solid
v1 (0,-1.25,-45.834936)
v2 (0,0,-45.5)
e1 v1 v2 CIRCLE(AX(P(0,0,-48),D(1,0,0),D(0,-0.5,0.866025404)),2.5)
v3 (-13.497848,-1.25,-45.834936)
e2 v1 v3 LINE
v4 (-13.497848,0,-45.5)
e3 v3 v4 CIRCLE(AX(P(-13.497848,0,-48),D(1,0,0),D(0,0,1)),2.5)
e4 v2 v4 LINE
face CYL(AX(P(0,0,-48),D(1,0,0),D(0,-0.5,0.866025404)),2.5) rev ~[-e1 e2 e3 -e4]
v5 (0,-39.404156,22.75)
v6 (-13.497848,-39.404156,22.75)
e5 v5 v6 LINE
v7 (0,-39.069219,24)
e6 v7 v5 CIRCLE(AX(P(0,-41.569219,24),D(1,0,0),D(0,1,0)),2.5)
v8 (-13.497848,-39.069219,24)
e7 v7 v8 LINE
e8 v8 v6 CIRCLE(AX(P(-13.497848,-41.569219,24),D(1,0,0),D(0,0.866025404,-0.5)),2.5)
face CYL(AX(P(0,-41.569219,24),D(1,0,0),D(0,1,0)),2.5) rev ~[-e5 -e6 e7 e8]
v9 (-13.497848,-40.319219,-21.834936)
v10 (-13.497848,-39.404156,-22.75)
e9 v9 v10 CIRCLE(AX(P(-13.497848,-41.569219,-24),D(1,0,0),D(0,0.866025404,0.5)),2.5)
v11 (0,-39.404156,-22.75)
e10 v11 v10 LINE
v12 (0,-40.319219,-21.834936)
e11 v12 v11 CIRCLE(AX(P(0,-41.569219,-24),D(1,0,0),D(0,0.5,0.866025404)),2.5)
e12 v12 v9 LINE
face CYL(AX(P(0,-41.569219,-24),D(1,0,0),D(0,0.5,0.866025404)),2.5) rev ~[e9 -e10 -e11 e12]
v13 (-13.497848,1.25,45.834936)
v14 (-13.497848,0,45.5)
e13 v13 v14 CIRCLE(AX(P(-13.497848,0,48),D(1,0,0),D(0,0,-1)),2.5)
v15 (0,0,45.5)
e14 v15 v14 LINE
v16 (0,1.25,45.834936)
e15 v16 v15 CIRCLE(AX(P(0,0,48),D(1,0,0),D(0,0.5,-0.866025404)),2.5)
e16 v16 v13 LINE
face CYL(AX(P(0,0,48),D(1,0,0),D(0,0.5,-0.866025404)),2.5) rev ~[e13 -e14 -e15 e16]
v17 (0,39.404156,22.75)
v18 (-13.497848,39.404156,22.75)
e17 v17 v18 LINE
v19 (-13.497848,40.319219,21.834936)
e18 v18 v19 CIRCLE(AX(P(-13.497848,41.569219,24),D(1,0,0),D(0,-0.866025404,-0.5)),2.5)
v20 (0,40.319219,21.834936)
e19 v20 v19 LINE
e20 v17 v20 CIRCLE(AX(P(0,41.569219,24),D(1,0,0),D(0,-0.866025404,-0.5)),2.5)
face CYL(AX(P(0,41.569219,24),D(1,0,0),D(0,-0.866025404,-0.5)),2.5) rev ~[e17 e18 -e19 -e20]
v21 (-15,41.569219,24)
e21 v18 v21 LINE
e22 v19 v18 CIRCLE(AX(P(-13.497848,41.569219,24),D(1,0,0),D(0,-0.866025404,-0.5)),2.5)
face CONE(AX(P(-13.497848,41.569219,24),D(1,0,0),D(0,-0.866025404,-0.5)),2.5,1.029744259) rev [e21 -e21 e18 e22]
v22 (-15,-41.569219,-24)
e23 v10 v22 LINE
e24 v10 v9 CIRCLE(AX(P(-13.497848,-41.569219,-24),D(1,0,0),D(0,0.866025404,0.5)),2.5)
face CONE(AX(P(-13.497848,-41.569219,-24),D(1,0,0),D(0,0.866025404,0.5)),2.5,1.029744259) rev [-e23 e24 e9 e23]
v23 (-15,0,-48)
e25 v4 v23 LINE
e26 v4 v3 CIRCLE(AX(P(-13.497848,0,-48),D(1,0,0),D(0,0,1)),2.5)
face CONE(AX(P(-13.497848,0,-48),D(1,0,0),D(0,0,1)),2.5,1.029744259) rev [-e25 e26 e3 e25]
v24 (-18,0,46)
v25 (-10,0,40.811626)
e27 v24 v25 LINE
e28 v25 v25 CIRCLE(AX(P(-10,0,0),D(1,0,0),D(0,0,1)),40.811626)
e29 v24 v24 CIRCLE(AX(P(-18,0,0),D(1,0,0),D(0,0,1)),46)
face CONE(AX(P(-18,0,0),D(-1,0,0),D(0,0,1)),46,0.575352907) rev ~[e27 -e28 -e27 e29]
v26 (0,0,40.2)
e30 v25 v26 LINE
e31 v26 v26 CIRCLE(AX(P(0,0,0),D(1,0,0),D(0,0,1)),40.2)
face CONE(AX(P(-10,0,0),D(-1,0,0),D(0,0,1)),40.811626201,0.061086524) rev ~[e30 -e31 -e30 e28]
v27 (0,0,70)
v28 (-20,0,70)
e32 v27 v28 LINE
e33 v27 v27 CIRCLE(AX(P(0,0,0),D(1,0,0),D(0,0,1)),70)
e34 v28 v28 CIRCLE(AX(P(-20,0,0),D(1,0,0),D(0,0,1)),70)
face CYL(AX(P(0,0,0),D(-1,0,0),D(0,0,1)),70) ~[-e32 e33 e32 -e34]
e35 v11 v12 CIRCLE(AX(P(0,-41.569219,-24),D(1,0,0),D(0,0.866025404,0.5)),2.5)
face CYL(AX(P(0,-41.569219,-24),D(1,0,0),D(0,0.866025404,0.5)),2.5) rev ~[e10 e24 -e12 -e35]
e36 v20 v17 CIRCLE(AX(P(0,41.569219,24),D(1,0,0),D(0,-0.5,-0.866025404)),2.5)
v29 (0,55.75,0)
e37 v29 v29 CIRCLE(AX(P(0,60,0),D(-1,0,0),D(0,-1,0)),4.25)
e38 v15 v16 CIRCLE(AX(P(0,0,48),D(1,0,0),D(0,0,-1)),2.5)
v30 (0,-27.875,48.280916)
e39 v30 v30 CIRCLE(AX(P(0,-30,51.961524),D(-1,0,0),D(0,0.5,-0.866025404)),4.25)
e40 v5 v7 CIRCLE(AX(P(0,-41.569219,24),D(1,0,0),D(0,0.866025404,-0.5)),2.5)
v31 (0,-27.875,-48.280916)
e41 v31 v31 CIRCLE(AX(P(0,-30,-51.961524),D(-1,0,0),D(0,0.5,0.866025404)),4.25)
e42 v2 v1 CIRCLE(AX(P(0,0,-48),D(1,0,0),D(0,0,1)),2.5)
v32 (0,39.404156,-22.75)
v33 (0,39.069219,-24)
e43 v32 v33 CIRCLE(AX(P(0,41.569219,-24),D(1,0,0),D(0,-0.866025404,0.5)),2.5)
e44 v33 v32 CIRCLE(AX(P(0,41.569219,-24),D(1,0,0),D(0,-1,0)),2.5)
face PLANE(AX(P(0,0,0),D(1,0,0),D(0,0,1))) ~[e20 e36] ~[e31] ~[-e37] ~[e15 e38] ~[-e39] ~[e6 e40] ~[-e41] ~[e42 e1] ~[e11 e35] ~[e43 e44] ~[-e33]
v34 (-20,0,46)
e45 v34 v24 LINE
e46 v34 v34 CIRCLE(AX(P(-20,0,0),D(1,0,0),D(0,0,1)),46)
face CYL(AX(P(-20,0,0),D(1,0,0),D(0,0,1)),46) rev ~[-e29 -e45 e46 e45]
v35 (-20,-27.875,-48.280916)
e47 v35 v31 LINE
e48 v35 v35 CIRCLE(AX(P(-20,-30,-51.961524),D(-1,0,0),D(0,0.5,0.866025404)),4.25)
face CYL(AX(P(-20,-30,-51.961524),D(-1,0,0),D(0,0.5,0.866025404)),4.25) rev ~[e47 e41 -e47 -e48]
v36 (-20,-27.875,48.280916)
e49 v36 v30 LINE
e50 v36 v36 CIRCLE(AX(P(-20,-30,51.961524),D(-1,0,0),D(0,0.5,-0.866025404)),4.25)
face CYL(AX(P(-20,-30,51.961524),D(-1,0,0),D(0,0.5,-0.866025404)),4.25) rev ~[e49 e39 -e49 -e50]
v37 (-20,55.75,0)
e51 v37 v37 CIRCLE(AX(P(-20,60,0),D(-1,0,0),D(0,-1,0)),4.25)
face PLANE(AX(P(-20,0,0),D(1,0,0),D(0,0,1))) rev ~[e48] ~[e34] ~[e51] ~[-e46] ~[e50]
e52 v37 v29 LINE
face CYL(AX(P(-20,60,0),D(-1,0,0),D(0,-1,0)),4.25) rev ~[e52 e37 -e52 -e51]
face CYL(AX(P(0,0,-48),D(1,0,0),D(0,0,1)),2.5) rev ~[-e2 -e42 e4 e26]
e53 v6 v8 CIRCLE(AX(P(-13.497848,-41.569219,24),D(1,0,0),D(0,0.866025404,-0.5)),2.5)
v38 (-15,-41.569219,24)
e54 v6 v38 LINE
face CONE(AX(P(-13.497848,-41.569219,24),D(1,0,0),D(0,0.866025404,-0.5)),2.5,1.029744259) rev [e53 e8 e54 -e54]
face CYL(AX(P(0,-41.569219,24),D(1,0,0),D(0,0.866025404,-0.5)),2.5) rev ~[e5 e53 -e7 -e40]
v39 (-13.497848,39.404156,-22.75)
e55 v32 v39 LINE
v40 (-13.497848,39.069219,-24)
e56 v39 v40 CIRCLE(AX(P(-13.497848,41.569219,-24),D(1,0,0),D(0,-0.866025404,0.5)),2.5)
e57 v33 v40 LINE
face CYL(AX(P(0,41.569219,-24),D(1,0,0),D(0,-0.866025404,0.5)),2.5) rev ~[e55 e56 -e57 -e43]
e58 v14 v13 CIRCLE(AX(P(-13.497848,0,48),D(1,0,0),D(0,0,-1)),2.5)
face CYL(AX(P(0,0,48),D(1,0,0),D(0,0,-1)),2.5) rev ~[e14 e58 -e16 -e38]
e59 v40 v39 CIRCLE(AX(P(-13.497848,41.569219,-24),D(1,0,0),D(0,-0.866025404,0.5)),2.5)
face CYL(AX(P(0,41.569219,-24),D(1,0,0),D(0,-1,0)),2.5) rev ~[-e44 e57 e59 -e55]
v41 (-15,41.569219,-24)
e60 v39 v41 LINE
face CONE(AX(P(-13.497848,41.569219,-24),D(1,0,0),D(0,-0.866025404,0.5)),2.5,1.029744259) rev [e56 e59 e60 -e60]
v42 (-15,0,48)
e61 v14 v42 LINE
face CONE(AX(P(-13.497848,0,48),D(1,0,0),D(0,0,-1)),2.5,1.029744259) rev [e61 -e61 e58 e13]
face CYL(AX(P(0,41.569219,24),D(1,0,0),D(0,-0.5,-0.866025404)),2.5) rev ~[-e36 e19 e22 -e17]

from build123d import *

# Parameters (mm, degrees)
F2_R            = 4.25
F3_DEPTH        = 20.001
F3_COPIES_COUNT = 3
F5_DEPTH        = 15
F5_COPIES_COUNT = 6


# Not quite as in the source:
# - a fillet or chamfer that OpenCascade refuses, or shapes differently, is made with other operations: its cross-section is extruded or revolved along the edge and cut away or added
# - a pattern or mirror of a feature is missing from the dataset's text; its kind, count and spacing are read off the source's solid


with BuildPart() as f1:
    # F0 (on Front) → F1 (revolve)
    with BuildSketch(Plane.XZ):
        Polygon((-10, 40.8116262015), (0, 40.2), (0, 70), (-20, 70), (-20, 46), (-18, 46), align=None)
    revolve(axis=Axis((12.3917190358, 0, 0), (1, 0, 0)))

    # F2 (on face) → F3 (cut, through all)
    with BuildSketch(Plane(origin=(-20, 0, 0), x_dir=(0, -1, 0), z_dir=(-1, 0, 0))):
        with Locations((-60, 0)):
            Circle(F2_R)
    f3 = extrude(amount=-F3_DEPTH, mode=Mode.SUBTRACT)

    # F3_copies: F3 ×3 about axis
    f3_copies_axis = Axis((0, 0, 0), (1, 0, 0))
    for i in range(1, F3_COPIES_COUNT):
        add(f3.rotate(f3_copies_axis, i * 360 / F3_COPIES_COUNT), mode=Mode.SUBTRACT)

    # F4 (on face) → F5 (cut)
    with BuildSketch(Plane.YZ):
        with BuildLine():
            ThreePointArc((-39.0692193817, 24), (-43.9840339474, 24.6470476128), (-39.4041558722, 22.75))
            ThreePointArc((-39.4041558722, 22.75), (-39.1544048159, 23.3529523872), (-39.0692193817, 24))
        make_face()
    f5 = extrude(amount=-F5_DEPTH, mode=Mode.SUBTRACT)

    # F5_copies: F5 ×6 about axis
    f5_copies_axis = Axis((0, 0, 0), (1, 0, 0))
    for i in range(1, F5_COPIES_COUNT):
        add(f5.rotate(f5_copies_axis, i * 360 / F5_COPIES_COUNT), mode=Mode.SUBTRACT)

    # F6: chamfer of 2.5 x 1.5021515476 on 6 edges, made by hand

    # F6_s1 → F6_t2 (revolve)
    with BuildSketch(Plane(origin=(0, 0, 0), x_dir=(1, 0, 0), z_dir=(0, -0.5, -0.8660254038))):
        Polygon((-13.4978484524, 45.5), (-15, 48), (-15, 45.5), align=None)
    revolve(axis=Axis((-15, -41.5692193817, 24), (1, 0, 0)))

    # F6_s3 → F6_t4 (revolve)
    with BuildSketch(Plane(origin=(0, 0, 0), x_dir=(1, 0, 0), z_dir=(0, -0.5, 0.8660254038))):
        Polygon((-13.4978484524, 45.5), (-15, 48), (-15, 45.5), align=None)
    revolve(axis=Axis((-15, 41.5692193817, 24), (1, 0, 0)))

    # F6_s5 → F6_t6 (revolve)
    with BuildSketch(Plane(origin=(0, 0, 0), x_dir=(1, 0, 0), z_dir=(0, 0.5, 0.8660254038))):
        Polygon((-13.4978484524, 45.5), (-15, 48), (-15, 45.5), align=None)
    revolve(axis=Axis((-15, 41.5692193817, -24), (1, 0, 0)))

    # F6_s7 → F6_t8 (revolve)
    with BuildSketch(Plane.XZ):
        Polygon((-13.4978484524, 45.5), (-15, 48), (-15, 45.5), align=None)
    revolve(axis=Axis((-15, 0, 48), (1, 0, 0)))

    # F6_s9 → F6_t10 (revolve)
    with BuildSketch(Plane.XZ):
        Polygon((-13.4978484524, -45.5), (-15, -48), (-15, -45.5), align=None)
    revolve(axis=Axis((-15, 0, -48), (1, 0, 0)))

    # F6_s11 → F6_t12 (revolve)
    with BuildSketch(Plane(origin=(0, 0, 0), x_dir=(1, 0, 0), z_dir=(0, 0.5, -0.8660254038))):
        Polygon((-13.4978484524, 45.5), (-15, 48), (-15, 45.5), align=None)
    revolve(axis=Axis((-15, -41.5692193817, -24), (1, 0, 0)))


solid = f1.part
